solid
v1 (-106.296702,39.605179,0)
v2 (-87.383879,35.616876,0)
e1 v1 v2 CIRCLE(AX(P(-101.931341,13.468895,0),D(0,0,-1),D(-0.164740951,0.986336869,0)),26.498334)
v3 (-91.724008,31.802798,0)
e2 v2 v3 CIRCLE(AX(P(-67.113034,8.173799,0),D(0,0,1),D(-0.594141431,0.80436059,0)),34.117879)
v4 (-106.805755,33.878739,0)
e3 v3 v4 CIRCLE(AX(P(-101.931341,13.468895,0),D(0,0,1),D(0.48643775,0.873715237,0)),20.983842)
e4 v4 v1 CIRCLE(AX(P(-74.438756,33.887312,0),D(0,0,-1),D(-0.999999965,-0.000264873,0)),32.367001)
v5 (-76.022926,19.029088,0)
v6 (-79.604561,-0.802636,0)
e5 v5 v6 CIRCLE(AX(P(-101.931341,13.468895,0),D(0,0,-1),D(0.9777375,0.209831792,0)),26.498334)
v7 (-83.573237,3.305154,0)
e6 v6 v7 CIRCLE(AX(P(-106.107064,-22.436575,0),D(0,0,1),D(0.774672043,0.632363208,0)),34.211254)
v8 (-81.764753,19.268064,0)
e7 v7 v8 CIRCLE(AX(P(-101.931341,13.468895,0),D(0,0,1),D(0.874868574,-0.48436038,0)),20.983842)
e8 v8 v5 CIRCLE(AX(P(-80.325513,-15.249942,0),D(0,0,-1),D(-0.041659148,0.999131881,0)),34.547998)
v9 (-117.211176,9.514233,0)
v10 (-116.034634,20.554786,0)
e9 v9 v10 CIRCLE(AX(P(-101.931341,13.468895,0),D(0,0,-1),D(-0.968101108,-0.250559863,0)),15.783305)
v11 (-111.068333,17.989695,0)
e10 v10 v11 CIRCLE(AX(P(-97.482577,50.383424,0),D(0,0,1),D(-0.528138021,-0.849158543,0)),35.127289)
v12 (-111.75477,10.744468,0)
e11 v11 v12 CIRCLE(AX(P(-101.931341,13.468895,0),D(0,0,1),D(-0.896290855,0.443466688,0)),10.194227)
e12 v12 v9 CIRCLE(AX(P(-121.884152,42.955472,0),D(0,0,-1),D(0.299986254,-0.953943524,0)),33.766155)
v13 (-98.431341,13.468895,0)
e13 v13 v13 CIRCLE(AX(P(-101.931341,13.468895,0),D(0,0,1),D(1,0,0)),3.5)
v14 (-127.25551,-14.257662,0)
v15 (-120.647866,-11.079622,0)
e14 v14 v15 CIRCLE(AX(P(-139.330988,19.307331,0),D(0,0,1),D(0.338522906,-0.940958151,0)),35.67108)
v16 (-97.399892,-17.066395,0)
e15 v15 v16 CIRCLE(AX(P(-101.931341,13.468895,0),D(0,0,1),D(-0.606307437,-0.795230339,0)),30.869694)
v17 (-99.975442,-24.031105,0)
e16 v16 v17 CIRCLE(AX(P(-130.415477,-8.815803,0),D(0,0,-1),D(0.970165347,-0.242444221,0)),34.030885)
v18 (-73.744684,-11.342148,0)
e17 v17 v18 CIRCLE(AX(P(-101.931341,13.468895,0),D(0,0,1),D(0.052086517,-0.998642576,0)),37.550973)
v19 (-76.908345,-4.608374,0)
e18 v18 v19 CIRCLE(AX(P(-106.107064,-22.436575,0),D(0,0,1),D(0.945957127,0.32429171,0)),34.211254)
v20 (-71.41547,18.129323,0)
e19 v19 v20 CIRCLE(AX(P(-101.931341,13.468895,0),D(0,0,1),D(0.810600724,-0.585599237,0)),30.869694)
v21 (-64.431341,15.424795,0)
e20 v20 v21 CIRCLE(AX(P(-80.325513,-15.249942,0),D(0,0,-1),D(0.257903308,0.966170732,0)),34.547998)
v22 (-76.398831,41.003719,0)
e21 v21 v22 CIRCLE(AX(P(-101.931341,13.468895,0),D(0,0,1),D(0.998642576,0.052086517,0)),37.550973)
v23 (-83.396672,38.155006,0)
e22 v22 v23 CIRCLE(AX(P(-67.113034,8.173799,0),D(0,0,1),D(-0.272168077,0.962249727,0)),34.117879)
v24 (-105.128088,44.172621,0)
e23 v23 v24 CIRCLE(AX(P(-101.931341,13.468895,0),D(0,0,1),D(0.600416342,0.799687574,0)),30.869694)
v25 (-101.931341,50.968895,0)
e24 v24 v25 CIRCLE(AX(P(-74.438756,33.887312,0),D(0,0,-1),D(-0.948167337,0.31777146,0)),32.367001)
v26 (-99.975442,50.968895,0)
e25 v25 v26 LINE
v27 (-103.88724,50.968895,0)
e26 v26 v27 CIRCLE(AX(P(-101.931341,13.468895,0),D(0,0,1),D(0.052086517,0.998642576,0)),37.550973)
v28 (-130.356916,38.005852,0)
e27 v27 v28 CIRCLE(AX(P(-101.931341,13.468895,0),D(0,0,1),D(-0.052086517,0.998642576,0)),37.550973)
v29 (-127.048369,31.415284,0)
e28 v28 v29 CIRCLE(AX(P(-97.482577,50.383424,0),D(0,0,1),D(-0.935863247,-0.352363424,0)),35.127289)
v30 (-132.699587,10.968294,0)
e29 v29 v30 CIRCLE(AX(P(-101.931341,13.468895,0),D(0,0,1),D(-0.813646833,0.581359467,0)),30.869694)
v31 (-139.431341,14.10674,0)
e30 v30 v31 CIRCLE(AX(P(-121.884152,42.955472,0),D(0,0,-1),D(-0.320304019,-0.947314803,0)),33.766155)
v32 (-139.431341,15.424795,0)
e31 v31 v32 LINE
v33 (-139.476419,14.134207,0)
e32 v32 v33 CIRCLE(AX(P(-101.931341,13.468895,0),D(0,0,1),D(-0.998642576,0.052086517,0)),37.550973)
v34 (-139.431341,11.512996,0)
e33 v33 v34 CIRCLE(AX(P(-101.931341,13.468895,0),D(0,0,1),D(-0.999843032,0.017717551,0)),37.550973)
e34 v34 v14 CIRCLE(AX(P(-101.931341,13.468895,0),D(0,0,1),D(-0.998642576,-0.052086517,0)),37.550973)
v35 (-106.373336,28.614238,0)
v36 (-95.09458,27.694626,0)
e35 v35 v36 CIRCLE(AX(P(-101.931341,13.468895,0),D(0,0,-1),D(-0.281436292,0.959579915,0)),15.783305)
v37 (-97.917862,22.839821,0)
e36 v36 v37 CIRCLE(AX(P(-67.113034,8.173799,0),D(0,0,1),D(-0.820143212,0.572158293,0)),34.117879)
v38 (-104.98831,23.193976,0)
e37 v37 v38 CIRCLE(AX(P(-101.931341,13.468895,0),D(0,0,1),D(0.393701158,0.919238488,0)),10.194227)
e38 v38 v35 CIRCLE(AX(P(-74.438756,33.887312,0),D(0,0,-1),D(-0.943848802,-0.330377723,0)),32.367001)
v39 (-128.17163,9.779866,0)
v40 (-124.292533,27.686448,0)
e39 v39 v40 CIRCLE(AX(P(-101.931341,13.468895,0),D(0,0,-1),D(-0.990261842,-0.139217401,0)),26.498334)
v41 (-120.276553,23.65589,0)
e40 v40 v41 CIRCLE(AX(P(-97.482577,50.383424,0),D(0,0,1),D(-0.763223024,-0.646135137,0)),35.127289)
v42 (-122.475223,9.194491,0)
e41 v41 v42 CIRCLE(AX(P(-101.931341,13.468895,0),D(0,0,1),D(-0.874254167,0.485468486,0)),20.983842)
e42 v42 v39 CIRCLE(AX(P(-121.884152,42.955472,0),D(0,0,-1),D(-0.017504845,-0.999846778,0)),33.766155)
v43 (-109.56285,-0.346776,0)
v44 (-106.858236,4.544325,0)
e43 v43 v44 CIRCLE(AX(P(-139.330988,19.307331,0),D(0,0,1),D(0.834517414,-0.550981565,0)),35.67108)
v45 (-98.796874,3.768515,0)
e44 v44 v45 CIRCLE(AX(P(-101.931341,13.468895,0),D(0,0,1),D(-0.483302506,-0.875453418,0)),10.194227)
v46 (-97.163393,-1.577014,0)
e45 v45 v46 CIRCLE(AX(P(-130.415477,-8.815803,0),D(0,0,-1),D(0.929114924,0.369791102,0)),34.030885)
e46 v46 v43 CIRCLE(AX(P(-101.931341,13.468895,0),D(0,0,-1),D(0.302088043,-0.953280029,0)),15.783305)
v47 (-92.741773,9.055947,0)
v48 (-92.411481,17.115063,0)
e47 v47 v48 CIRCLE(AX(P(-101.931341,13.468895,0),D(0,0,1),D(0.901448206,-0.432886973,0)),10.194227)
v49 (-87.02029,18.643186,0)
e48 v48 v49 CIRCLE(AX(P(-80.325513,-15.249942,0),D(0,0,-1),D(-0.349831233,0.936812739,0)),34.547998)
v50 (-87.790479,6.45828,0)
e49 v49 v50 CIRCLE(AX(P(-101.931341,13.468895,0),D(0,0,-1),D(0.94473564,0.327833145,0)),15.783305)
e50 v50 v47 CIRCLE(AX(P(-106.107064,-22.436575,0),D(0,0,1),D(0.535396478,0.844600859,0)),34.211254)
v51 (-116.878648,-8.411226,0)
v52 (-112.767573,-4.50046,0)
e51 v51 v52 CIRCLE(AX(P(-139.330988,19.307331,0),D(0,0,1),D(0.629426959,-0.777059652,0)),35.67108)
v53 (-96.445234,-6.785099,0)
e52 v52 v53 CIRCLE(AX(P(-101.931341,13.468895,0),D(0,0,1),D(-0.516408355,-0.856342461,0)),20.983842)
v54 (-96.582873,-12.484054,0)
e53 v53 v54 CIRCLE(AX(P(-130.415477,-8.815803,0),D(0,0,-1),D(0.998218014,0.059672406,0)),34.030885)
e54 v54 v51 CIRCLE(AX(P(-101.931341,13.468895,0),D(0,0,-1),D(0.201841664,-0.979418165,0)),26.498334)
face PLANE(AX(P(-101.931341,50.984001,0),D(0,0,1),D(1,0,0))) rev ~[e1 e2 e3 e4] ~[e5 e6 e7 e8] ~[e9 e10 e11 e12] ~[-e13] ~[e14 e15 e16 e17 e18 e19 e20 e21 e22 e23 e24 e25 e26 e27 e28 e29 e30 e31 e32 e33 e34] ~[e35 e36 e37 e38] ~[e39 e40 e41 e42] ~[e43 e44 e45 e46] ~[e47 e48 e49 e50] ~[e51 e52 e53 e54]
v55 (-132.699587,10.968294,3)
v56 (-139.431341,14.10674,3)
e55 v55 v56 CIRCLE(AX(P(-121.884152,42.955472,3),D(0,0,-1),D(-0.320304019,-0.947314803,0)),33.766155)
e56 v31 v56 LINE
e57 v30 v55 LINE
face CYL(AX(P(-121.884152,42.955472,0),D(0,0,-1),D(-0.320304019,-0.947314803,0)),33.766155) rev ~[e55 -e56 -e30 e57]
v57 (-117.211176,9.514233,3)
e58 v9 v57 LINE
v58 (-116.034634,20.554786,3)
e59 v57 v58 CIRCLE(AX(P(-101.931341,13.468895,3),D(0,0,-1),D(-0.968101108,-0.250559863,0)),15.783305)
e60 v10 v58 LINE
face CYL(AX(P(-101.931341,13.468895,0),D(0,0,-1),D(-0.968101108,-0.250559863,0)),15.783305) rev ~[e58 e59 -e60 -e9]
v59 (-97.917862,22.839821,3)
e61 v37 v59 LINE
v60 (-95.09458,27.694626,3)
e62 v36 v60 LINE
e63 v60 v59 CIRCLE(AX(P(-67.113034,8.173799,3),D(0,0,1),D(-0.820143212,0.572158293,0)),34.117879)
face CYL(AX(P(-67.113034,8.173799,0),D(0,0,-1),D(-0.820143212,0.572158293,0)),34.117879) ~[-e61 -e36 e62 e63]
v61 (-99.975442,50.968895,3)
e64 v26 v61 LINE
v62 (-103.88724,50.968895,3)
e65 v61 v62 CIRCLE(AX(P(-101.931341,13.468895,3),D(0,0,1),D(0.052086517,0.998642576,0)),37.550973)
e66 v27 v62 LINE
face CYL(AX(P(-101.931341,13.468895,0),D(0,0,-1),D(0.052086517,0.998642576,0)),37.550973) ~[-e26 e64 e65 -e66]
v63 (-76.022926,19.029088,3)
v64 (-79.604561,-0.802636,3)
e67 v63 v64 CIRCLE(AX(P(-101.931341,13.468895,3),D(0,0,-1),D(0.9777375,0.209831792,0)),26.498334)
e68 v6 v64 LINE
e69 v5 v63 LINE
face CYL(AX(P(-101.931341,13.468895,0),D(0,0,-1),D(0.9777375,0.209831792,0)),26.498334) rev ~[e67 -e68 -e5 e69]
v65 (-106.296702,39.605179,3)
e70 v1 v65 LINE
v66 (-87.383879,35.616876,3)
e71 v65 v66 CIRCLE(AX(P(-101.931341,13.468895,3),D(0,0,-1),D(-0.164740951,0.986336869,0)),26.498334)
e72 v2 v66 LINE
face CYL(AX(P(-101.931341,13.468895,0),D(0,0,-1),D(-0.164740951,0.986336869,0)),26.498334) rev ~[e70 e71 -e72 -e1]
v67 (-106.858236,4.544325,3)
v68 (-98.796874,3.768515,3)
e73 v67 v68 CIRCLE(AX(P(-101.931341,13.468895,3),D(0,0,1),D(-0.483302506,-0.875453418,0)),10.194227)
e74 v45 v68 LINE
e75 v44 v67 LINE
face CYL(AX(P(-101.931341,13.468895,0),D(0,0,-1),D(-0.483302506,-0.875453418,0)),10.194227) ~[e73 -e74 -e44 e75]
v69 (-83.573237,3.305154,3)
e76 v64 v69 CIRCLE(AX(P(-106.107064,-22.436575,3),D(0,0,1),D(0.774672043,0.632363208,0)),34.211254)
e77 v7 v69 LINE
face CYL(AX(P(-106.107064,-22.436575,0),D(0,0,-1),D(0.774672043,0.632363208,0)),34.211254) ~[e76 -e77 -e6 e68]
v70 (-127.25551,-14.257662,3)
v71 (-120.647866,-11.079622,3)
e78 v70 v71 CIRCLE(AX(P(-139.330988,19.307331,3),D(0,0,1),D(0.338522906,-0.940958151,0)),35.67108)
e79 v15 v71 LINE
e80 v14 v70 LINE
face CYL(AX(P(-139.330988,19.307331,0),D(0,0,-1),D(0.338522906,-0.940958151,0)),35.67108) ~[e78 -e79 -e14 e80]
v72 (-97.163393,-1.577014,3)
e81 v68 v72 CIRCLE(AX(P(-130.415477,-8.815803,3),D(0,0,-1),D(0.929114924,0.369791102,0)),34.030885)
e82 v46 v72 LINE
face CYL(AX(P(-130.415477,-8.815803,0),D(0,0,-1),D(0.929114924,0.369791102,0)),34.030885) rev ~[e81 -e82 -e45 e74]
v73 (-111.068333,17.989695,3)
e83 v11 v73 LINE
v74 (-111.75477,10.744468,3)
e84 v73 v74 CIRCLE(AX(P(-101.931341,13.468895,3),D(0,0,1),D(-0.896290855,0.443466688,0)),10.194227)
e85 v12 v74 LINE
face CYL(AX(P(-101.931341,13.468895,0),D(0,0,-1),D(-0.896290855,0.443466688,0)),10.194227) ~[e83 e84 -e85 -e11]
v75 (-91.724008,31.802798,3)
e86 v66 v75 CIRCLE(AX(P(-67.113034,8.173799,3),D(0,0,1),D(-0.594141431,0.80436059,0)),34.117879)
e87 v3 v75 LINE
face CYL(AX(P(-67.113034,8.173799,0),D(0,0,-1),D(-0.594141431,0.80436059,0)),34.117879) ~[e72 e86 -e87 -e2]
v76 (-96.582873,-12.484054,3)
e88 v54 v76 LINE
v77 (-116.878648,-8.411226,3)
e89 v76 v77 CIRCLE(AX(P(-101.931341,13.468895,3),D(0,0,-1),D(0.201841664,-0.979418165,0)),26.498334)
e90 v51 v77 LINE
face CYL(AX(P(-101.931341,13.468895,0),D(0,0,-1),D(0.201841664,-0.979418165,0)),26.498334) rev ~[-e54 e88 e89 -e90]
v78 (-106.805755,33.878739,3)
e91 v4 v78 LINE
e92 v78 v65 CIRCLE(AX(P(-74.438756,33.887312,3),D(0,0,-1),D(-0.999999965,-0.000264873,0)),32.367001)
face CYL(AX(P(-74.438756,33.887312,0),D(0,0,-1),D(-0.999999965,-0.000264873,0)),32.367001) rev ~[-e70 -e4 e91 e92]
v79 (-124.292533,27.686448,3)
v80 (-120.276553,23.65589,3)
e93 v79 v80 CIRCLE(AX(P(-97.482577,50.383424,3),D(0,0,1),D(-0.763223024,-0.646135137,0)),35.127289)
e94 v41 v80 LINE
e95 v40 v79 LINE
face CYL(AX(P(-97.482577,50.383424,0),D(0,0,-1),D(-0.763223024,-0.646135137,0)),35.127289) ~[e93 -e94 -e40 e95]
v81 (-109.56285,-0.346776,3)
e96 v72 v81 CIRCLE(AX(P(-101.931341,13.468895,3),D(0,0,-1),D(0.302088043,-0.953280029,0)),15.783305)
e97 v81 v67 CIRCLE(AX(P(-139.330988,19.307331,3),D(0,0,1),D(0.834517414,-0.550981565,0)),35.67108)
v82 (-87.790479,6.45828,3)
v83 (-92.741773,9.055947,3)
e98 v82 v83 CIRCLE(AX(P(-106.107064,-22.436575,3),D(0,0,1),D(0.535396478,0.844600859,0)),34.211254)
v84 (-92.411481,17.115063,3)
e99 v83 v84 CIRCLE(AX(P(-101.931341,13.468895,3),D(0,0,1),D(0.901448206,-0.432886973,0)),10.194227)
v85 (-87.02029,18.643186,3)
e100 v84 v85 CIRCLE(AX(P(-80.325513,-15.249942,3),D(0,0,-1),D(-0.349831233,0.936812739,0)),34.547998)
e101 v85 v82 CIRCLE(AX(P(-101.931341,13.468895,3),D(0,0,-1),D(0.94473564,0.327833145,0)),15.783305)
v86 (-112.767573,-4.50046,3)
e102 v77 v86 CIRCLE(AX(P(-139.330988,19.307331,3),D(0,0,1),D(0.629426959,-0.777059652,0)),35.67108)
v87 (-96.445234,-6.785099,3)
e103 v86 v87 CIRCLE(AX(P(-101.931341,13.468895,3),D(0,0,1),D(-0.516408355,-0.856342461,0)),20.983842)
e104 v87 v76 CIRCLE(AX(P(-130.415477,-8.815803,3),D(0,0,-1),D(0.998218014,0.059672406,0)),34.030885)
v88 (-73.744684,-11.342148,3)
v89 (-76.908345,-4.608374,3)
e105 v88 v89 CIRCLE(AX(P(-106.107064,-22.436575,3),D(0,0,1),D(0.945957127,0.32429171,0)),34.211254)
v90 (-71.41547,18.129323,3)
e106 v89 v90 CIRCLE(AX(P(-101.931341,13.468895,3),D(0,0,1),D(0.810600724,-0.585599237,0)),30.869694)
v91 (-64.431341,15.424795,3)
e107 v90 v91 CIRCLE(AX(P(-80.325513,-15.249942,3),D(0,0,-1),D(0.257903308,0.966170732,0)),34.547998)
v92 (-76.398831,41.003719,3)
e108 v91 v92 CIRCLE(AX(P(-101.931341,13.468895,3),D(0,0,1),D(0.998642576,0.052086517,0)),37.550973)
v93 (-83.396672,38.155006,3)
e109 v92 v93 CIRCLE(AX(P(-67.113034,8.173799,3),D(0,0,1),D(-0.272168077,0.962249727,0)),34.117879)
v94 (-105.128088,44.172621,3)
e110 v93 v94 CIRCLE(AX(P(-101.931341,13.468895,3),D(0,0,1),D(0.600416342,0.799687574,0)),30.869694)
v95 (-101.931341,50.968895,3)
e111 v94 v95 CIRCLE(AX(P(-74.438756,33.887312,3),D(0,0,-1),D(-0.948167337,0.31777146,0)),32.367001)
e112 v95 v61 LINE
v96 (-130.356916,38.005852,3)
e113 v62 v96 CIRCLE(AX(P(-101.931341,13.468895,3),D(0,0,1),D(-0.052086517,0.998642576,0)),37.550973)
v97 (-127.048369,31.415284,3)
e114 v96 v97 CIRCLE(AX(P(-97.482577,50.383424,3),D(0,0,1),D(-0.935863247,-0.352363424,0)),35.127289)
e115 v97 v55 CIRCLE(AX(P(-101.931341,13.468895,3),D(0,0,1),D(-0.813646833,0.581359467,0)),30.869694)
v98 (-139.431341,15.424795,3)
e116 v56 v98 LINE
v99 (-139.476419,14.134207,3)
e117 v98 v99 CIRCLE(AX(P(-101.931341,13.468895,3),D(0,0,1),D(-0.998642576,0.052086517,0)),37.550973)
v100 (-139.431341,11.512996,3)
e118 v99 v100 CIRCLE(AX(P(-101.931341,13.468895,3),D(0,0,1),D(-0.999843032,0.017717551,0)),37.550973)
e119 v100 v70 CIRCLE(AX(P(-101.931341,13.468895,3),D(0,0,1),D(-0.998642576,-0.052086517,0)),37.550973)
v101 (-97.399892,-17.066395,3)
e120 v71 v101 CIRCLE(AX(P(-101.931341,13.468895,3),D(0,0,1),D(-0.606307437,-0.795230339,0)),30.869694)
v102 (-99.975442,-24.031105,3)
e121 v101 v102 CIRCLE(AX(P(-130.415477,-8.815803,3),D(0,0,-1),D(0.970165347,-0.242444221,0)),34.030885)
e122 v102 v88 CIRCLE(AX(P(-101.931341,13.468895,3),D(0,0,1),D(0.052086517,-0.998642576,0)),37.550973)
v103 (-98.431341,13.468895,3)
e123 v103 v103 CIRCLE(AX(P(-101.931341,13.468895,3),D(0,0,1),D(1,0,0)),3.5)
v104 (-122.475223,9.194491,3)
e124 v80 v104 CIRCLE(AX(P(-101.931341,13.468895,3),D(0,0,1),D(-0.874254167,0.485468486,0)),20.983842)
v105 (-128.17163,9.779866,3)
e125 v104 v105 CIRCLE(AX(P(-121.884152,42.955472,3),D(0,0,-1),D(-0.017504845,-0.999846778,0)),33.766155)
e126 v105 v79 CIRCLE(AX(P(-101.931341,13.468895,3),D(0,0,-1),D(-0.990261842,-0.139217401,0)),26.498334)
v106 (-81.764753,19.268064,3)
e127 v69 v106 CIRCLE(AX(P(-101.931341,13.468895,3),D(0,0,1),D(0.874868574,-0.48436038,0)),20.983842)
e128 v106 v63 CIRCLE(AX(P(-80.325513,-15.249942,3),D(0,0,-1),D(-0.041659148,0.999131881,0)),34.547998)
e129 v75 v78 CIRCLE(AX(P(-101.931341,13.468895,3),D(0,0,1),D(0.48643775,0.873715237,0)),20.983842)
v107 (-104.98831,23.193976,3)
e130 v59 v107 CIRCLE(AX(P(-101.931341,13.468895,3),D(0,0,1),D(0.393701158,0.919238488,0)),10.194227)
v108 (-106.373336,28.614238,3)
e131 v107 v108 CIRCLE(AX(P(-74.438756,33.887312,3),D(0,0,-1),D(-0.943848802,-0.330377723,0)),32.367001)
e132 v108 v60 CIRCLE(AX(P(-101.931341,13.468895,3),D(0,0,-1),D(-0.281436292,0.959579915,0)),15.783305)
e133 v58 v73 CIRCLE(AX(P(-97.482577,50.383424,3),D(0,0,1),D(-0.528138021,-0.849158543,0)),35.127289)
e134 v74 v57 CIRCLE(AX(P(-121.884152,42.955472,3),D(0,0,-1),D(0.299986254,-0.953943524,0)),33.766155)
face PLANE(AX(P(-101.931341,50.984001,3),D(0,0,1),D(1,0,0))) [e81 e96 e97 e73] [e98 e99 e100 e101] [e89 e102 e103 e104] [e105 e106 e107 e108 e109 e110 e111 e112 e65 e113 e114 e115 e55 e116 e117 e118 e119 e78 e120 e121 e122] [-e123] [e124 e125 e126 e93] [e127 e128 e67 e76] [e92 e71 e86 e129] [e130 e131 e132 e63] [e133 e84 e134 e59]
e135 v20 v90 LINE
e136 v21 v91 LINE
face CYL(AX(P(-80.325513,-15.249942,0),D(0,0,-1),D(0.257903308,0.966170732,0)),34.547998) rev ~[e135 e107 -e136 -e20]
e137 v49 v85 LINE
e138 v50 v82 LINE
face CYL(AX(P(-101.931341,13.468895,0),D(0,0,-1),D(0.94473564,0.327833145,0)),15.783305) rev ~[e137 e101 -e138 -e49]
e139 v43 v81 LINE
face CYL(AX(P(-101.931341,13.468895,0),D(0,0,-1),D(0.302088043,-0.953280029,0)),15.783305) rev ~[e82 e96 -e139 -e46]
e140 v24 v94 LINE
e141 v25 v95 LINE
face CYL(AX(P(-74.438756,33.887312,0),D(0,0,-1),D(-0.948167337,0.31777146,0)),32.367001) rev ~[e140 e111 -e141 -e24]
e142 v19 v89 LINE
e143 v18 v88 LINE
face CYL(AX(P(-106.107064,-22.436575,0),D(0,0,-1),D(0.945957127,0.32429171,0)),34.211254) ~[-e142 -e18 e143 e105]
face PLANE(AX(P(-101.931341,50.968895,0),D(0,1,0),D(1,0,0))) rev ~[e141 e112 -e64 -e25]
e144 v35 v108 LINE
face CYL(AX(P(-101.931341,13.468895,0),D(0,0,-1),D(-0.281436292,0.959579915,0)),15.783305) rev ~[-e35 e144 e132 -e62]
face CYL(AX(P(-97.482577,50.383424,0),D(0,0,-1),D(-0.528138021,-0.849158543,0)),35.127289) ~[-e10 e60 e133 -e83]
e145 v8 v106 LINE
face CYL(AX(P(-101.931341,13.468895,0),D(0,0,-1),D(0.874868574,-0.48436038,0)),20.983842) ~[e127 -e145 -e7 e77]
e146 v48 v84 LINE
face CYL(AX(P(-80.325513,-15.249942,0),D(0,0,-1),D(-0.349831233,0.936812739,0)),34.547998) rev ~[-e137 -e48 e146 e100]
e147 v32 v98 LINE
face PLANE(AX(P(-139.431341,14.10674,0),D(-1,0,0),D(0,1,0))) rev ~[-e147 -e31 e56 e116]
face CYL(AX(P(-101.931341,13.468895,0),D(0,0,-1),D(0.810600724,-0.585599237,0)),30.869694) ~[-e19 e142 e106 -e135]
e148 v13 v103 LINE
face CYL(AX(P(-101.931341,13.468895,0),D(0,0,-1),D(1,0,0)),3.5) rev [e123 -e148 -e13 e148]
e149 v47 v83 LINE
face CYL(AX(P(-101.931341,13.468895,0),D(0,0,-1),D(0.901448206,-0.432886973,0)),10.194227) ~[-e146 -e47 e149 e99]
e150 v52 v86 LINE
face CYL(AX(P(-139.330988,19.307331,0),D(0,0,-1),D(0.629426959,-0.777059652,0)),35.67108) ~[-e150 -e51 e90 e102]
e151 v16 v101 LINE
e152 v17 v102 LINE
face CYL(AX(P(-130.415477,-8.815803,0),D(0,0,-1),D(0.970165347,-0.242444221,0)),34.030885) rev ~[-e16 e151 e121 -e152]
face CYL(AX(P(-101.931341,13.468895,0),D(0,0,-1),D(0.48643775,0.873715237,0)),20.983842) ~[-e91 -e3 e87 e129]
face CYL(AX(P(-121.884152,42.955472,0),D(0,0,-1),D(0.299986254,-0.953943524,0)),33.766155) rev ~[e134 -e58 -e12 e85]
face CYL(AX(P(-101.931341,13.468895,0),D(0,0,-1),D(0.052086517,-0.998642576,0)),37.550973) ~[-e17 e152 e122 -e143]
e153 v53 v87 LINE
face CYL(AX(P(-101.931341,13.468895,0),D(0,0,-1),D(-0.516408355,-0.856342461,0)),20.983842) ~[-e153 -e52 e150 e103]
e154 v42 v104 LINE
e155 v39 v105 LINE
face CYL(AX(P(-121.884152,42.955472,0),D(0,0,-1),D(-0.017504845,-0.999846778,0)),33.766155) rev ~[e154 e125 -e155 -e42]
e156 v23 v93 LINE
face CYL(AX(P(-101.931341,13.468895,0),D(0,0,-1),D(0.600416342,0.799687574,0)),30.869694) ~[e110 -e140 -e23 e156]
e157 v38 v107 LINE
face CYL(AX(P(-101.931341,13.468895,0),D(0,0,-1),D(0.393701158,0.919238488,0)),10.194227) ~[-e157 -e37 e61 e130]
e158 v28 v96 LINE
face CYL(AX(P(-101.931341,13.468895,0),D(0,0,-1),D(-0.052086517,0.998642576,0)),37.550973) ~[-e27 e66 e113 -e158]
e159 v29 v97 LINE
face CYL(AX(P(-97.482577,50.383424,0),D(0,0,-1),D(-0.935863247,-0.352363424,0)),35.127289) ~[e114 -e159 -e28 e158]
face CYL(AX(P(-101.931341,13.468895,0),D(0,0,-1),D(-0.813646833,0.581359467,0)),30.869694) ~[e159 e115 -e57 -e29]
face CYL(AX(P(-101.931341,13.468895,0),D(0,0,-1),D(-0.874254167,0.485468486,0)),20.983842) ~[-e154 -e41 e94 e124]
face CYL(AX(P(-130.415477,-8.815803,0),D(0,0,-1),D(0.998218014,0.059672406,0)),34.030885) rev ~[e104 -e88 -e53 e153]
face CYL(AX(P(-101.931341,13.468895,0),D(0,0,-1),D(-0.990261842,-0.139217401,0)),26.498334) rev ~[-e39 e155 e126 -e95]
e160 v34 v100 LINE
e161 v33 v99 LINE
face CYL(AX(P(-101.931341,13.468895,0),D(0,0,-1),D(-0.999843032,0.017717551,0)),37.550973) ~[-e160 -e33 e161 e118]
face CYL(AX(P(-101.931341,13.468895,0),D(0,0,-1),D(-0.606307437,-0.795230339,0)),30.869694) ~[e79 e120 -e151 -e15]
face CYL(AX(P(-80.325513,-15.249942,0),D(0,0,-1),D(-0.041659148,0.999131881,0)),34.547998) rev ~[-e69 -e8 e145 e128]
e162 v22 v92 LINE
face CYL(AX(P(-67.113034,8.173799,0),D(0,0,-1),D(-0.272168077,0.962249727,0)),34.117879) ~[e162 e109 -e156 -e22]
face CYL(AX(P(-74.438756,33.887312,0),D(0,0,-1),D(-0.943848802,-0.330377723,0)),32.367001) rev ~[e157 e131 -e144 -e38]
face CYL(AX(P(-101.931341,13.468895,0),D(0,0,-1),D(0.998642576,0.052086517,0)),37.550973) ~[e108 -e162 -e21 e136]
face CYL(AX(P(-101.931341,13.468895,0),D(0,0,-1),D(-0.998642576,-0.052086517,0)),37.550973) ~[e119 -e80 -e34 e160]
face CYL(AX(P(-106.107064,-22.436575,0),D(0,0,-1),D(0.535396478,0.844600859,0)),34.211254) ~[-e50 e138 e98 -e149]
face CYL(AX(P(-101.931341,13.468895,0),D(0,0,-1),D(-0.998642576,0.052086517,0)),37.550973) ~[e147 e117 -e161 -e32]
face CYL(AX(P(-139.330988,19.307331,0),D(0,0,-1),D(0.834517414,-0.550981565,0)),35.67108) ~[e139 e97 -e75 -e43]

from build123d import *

# Parameters (mm, degrees)
F0_R     = 3.5
F1_DEPTH = 3


# Not quite as in the source:
# - a feature names something its author has since deleted; it is built from what else it names


with BuildPart() as f1:
    # F0 (on Top) → F1 (new body)
    with BuildSketch(Plane.XY):
        with BuildLine():
            Line((-103.8872403759, 50.9688953831), (-101.9313409925, 50.9688953831))
            Line((-101.9313409925, 50.9688953831), (-99.975441609, 50.9688953831))
            ThreePointArc((-99.975441609, 50.9688953831), (-101.9313409925, 51.0198679723), (-103.8872403759, 50.9688953831))
        make_face()
        with BuildLine():
            ThreePointArc((-105.128088395, 44.1726214205), (-103.7275117352, 47.6637957311), (-101.9313409925, 50.9688953831))
            Line((-101.9313409925, 50.9688953831), (-103.8872403759, 50.9688953831))
            ThreePointArc((-103.8872403759, 50.9688953831), (-118.4470490216, 47.1928769199), (-130.3569155648, 38.005852257))
            ThreePointArc((-130.3569155648, 38.005852257), (-128.876069776, 34.6235055457), (-127.0483694881, 31.4152840472))
            ThreePointArc((-127.0483694881, 31.4152840472), (-131.6855143995, 21.6924682926), (-132.6995872702, 10.9682939496))
            ThreePointArc((-132.6995872702, 10.9682939496), (-136.152020588, 12.3518590173), (-139.4313409925, 14.1067395817))
            Line((-139.4313409925, 14.1067395817), (-139.4313409925, 11.5129959997))
            ThreePointArc((-139.4313409925, 11.5129959997), (-135.8835245013, -2.5724504886), (-127.2555101816, -14.2576622337))
            ThreePointArc((-127.2555101816, -14.2576622337), (-123.8698155437, -12.8388675837), (-120.6478658456, -11.079621557))
            ThreePointArc((-120.6478658456, -11.079621557), (-109.6296820224, -16.4254775309), (-97.3998915176, -17.0663948921))
            ThreePointArc((-97.3998915176, -17.0663948921), (-98.4971319541, -20.6192094649), (-99.975441609, -24.0311046169))
            ThreePointArc((-99.975441609, -24.0311046169), (-85.5790985856, -20.3346504467), (-73.7446837693, -11.342148468))
            ThreePointArc((-73.7446837693, -11.342148468), (-75.1429207557, -7.8890051383), (-76.9083449574, -4.6083736574))
            ThreePointArc((-76.9083449574, -4.6083736574), (-71.9248057865, 6.2200450283), (-71.4154696243, 18.1293225284))
            ThreePointArc((-71.4154696243, 18.1293225284), (-67.8499010769, 16.9668747828), (-64.4313409925, 15.4247947665))
            ThreePointArc((-64.4313409925, 15.4247947665), (-67.9189218222, 29.3821252434), (-76.3988312093, 41.0037185452))
            ThreePointArc((-76.3988312093, 41.0037185452), (-79.9768515125, 39.773669955), (-83.3966724505, 38.1550058214))
            ThreePointArc((-83.3966724505, 38.1550058214), (-93.6932659385, 43.219056827), (-105.128088395, 44.1726214205))
        make_face()
        with BuildLine():
            ThreePointArc((-116.8786483854, -8.4112257418), (-114.7452282061, -6.5377141597), (-112.7675725108, -4.500459816))
            ThreePointArc((-112.7675725108, -4.500459816), (-104.8400955118, -7.312365092), (-96.445234408, -6.785098651))
            ThreePointArc((-96.445234408, -6.785098651), (-96.3945126034, -9.6374635235), (-96.5828731928, -12.4840541783))
            ThreePointArc((-96.5828731928, -12.4840541783), (-107.144920689, -12.5114873217), (-116.8786483854, -8.4112257418))
        make_face(mode=Mode.SUBTRACT)
        with BuildLine():
            ThreePointArc((-97.1633932868, -1.5770140117), (-103.489663028, -2.237292801), (-109.5628503108, -0.3467761664))
            ThreePointArc((-109.5628503108, -0.3467761664), (-108.1146014235, 2.0457215346), (-106.8582364184, 4.544324557))
            ThreePointArc((-106.8582364184, 4.544324557), (-102.9079011749, 3.321551239), (-98.7968737544, 3.768515076))
            ThreePointArc((-98.7968737544, 3.768515076), (-97.870198127, 1.1293444599), (-97.1633932868, -1.5770140117))
        make_face(mode=Mode.SUBTRACT)
        with BuildLine():
            ThreePointArc((-87.020290304, 18.643185886), (-86.1794714129, 12.4732450474), (-87.7904785909, 6.4582801904))
            ThreePointArc((-87.7904785909, 6.4582801904), (-90.2129680661, 7.8584356684), (-92.7417733998, 9.0559473403))
            ThreePointArc((-92.7417733998, 9.0559473403), (-91.7456646982, 13.0514491022), (-92.4114813686, 17.1150626462))
            ThreePointArc((-92.4114813686, 17.1150626462), (-89.7469190596, 17.9886089148), (-87.020290304, 18.643185886))
        make_face(mode=Mode.SUBTRACT)
        with BuildLine():
            ThreePointArc((-79.6045613776, -0.8026360965), (-81.5030217359, 1.3342277264), (-83.5732367524, 3.3051535278))
            ThreePointArc((-83.5732367524, 3.3051535278), (-81.0808826805, 11.1066871006), (-81.7647527708, 19.2680642275))
            ThreePointArc((-81.7647527708, 19.2680642275), (-78.8888619154, 19.2681720991), (-76.0229262651, 19.0290882807))
            ThreePointArc((-76.0229262651, 19.0290882807), (-75.8548608571, 8.7594492912), (-79.6045613776, -0.8026360965))
        make_face(mode=Mode.SUBTRACT)
        with BuildLine():
            ThreePointArc((-124.2925325258, 27.6864483354), (-122.366283457, 25.5897237243), (-120.2765526126, 23.655889562))
            ThreePointArc((-120.2765526126, 23.655889562), (-122.6767843834, 16.6229750116), (-122.4752234892, 9.1944911263))
            ThreePointArc((-122.4752234892, 9.1944911263), (-125.3358583127, 9.3662040749), (-128.1716299117, 9.7798662184))
            ThreePointArc((-128.1716299117, 9.7798662184), (-127.8289740179, 19.0790916737), (-124.2925325258, 27.6864483354))
        make_face(mode=Mode.SUBTRACT)
        with BuildLine():
            ThreePointArc((-116.0346336158, 20.5547864365), (-113.602585651, 19.1733015065), (-111.068333377, 17.9896954377))
            ThreePointArc((-111.068333377, 17.9896954377), (-112.0801205218, 14.4304238708), (-111.7547699117, 10.7444675099))
            ThreePointArc((-111.7547699117, 10.7444675099), (-114.4574555109, 10.0161737122), (-117.2111759917, 9.514232662))
            ThreePointArc((-117.2111759917, 9.514232662), (-117.6257828154, 15.1413817681), (-116.0346336158, 20.5547864365))
        make_face(mode=Mode.SUBTRACT)
        with Locations((-101.9313409925, 13.4688953831)):
            Circle(F0_R, mode=Mode.SUBTRACT)
        with BuildLine():
            ThreePointArc((-106.3733358176, 28.6142377963), (-100.6487081208, 29.1999973076), (-95.0945804167, 27.6946262842))
            ThreePointArc((-95.0945804167, 27.6946262842), (-96.6062830352, 25.3254140346), (-97.9178620412, 22.8398211472))
            ThreePointArc((-97.9178620412, 22.8398211472), (-101.4213565394, 23.6503578923), (-104.988310348, 23.1939764279))
            ThreePointArc((-104.988310348, 23.1939764279), (-105.7981495503, 25.8741269811), (-106.3733358176, 28.6142377963))
        make_face(mode=Mode.SUBTRACT)
        with BuildLine():
            ThreePointArc((-87.3838790757, 35.6168761154), (-89.634828263, 33.8018778137), (-91.7240079261, 31.8027981717))
            ThreePointArc((-91.7240079261, 31.8027981717), (-99.0699795968, 34.2567343942), (-106.8057550879, 33.8787392584))
            ThreePointArc((-106.8057550879, 33.8787392584), (-106.6786212529, 36.7532837824), (-106.296701705, 39.6051790629))
            ThreePointArc((-106.296701705, 39.6051790629), (-96.4636690625, 39.3969933158), (-87.3838790757, 35.6168761154))
        make_face(mode=Mode.SUBTRACT)
        with BuildLine():
            Line((-139.4313409925, 14.1067395817), (-139.4313409925, 15.4247947665))
            ThreePointArc((-139.4313409925, 15.4247947665), (-139.4594284478, 14.7796945074), (-139.4764192758, 14.1342066599))
            ThreePointArc((-139.4764192758, 14.1342066599), (-139.4538855016, 14.1204643119), (-139.4313409925, 14.1067395817))
        make_face()
        with BuildLine():
            Line((-139.4313409925, 11.5129959997), (-139.4313409925, 14.1067395817))
            ThreePointArc((-139.4313409925, 14.1067395817), (-139.4538855016, 14.1204643119), (-139.4764192758, 14.1342066599))
            ThreePointArc((-139.4764192758, 14.1342066599), (-139.4767618846, 12.8232078208), (-139.4313409925, 11.5129959997))
        make_face()
    extrude(amount=F1_DEPTH)


solid = f1.part
